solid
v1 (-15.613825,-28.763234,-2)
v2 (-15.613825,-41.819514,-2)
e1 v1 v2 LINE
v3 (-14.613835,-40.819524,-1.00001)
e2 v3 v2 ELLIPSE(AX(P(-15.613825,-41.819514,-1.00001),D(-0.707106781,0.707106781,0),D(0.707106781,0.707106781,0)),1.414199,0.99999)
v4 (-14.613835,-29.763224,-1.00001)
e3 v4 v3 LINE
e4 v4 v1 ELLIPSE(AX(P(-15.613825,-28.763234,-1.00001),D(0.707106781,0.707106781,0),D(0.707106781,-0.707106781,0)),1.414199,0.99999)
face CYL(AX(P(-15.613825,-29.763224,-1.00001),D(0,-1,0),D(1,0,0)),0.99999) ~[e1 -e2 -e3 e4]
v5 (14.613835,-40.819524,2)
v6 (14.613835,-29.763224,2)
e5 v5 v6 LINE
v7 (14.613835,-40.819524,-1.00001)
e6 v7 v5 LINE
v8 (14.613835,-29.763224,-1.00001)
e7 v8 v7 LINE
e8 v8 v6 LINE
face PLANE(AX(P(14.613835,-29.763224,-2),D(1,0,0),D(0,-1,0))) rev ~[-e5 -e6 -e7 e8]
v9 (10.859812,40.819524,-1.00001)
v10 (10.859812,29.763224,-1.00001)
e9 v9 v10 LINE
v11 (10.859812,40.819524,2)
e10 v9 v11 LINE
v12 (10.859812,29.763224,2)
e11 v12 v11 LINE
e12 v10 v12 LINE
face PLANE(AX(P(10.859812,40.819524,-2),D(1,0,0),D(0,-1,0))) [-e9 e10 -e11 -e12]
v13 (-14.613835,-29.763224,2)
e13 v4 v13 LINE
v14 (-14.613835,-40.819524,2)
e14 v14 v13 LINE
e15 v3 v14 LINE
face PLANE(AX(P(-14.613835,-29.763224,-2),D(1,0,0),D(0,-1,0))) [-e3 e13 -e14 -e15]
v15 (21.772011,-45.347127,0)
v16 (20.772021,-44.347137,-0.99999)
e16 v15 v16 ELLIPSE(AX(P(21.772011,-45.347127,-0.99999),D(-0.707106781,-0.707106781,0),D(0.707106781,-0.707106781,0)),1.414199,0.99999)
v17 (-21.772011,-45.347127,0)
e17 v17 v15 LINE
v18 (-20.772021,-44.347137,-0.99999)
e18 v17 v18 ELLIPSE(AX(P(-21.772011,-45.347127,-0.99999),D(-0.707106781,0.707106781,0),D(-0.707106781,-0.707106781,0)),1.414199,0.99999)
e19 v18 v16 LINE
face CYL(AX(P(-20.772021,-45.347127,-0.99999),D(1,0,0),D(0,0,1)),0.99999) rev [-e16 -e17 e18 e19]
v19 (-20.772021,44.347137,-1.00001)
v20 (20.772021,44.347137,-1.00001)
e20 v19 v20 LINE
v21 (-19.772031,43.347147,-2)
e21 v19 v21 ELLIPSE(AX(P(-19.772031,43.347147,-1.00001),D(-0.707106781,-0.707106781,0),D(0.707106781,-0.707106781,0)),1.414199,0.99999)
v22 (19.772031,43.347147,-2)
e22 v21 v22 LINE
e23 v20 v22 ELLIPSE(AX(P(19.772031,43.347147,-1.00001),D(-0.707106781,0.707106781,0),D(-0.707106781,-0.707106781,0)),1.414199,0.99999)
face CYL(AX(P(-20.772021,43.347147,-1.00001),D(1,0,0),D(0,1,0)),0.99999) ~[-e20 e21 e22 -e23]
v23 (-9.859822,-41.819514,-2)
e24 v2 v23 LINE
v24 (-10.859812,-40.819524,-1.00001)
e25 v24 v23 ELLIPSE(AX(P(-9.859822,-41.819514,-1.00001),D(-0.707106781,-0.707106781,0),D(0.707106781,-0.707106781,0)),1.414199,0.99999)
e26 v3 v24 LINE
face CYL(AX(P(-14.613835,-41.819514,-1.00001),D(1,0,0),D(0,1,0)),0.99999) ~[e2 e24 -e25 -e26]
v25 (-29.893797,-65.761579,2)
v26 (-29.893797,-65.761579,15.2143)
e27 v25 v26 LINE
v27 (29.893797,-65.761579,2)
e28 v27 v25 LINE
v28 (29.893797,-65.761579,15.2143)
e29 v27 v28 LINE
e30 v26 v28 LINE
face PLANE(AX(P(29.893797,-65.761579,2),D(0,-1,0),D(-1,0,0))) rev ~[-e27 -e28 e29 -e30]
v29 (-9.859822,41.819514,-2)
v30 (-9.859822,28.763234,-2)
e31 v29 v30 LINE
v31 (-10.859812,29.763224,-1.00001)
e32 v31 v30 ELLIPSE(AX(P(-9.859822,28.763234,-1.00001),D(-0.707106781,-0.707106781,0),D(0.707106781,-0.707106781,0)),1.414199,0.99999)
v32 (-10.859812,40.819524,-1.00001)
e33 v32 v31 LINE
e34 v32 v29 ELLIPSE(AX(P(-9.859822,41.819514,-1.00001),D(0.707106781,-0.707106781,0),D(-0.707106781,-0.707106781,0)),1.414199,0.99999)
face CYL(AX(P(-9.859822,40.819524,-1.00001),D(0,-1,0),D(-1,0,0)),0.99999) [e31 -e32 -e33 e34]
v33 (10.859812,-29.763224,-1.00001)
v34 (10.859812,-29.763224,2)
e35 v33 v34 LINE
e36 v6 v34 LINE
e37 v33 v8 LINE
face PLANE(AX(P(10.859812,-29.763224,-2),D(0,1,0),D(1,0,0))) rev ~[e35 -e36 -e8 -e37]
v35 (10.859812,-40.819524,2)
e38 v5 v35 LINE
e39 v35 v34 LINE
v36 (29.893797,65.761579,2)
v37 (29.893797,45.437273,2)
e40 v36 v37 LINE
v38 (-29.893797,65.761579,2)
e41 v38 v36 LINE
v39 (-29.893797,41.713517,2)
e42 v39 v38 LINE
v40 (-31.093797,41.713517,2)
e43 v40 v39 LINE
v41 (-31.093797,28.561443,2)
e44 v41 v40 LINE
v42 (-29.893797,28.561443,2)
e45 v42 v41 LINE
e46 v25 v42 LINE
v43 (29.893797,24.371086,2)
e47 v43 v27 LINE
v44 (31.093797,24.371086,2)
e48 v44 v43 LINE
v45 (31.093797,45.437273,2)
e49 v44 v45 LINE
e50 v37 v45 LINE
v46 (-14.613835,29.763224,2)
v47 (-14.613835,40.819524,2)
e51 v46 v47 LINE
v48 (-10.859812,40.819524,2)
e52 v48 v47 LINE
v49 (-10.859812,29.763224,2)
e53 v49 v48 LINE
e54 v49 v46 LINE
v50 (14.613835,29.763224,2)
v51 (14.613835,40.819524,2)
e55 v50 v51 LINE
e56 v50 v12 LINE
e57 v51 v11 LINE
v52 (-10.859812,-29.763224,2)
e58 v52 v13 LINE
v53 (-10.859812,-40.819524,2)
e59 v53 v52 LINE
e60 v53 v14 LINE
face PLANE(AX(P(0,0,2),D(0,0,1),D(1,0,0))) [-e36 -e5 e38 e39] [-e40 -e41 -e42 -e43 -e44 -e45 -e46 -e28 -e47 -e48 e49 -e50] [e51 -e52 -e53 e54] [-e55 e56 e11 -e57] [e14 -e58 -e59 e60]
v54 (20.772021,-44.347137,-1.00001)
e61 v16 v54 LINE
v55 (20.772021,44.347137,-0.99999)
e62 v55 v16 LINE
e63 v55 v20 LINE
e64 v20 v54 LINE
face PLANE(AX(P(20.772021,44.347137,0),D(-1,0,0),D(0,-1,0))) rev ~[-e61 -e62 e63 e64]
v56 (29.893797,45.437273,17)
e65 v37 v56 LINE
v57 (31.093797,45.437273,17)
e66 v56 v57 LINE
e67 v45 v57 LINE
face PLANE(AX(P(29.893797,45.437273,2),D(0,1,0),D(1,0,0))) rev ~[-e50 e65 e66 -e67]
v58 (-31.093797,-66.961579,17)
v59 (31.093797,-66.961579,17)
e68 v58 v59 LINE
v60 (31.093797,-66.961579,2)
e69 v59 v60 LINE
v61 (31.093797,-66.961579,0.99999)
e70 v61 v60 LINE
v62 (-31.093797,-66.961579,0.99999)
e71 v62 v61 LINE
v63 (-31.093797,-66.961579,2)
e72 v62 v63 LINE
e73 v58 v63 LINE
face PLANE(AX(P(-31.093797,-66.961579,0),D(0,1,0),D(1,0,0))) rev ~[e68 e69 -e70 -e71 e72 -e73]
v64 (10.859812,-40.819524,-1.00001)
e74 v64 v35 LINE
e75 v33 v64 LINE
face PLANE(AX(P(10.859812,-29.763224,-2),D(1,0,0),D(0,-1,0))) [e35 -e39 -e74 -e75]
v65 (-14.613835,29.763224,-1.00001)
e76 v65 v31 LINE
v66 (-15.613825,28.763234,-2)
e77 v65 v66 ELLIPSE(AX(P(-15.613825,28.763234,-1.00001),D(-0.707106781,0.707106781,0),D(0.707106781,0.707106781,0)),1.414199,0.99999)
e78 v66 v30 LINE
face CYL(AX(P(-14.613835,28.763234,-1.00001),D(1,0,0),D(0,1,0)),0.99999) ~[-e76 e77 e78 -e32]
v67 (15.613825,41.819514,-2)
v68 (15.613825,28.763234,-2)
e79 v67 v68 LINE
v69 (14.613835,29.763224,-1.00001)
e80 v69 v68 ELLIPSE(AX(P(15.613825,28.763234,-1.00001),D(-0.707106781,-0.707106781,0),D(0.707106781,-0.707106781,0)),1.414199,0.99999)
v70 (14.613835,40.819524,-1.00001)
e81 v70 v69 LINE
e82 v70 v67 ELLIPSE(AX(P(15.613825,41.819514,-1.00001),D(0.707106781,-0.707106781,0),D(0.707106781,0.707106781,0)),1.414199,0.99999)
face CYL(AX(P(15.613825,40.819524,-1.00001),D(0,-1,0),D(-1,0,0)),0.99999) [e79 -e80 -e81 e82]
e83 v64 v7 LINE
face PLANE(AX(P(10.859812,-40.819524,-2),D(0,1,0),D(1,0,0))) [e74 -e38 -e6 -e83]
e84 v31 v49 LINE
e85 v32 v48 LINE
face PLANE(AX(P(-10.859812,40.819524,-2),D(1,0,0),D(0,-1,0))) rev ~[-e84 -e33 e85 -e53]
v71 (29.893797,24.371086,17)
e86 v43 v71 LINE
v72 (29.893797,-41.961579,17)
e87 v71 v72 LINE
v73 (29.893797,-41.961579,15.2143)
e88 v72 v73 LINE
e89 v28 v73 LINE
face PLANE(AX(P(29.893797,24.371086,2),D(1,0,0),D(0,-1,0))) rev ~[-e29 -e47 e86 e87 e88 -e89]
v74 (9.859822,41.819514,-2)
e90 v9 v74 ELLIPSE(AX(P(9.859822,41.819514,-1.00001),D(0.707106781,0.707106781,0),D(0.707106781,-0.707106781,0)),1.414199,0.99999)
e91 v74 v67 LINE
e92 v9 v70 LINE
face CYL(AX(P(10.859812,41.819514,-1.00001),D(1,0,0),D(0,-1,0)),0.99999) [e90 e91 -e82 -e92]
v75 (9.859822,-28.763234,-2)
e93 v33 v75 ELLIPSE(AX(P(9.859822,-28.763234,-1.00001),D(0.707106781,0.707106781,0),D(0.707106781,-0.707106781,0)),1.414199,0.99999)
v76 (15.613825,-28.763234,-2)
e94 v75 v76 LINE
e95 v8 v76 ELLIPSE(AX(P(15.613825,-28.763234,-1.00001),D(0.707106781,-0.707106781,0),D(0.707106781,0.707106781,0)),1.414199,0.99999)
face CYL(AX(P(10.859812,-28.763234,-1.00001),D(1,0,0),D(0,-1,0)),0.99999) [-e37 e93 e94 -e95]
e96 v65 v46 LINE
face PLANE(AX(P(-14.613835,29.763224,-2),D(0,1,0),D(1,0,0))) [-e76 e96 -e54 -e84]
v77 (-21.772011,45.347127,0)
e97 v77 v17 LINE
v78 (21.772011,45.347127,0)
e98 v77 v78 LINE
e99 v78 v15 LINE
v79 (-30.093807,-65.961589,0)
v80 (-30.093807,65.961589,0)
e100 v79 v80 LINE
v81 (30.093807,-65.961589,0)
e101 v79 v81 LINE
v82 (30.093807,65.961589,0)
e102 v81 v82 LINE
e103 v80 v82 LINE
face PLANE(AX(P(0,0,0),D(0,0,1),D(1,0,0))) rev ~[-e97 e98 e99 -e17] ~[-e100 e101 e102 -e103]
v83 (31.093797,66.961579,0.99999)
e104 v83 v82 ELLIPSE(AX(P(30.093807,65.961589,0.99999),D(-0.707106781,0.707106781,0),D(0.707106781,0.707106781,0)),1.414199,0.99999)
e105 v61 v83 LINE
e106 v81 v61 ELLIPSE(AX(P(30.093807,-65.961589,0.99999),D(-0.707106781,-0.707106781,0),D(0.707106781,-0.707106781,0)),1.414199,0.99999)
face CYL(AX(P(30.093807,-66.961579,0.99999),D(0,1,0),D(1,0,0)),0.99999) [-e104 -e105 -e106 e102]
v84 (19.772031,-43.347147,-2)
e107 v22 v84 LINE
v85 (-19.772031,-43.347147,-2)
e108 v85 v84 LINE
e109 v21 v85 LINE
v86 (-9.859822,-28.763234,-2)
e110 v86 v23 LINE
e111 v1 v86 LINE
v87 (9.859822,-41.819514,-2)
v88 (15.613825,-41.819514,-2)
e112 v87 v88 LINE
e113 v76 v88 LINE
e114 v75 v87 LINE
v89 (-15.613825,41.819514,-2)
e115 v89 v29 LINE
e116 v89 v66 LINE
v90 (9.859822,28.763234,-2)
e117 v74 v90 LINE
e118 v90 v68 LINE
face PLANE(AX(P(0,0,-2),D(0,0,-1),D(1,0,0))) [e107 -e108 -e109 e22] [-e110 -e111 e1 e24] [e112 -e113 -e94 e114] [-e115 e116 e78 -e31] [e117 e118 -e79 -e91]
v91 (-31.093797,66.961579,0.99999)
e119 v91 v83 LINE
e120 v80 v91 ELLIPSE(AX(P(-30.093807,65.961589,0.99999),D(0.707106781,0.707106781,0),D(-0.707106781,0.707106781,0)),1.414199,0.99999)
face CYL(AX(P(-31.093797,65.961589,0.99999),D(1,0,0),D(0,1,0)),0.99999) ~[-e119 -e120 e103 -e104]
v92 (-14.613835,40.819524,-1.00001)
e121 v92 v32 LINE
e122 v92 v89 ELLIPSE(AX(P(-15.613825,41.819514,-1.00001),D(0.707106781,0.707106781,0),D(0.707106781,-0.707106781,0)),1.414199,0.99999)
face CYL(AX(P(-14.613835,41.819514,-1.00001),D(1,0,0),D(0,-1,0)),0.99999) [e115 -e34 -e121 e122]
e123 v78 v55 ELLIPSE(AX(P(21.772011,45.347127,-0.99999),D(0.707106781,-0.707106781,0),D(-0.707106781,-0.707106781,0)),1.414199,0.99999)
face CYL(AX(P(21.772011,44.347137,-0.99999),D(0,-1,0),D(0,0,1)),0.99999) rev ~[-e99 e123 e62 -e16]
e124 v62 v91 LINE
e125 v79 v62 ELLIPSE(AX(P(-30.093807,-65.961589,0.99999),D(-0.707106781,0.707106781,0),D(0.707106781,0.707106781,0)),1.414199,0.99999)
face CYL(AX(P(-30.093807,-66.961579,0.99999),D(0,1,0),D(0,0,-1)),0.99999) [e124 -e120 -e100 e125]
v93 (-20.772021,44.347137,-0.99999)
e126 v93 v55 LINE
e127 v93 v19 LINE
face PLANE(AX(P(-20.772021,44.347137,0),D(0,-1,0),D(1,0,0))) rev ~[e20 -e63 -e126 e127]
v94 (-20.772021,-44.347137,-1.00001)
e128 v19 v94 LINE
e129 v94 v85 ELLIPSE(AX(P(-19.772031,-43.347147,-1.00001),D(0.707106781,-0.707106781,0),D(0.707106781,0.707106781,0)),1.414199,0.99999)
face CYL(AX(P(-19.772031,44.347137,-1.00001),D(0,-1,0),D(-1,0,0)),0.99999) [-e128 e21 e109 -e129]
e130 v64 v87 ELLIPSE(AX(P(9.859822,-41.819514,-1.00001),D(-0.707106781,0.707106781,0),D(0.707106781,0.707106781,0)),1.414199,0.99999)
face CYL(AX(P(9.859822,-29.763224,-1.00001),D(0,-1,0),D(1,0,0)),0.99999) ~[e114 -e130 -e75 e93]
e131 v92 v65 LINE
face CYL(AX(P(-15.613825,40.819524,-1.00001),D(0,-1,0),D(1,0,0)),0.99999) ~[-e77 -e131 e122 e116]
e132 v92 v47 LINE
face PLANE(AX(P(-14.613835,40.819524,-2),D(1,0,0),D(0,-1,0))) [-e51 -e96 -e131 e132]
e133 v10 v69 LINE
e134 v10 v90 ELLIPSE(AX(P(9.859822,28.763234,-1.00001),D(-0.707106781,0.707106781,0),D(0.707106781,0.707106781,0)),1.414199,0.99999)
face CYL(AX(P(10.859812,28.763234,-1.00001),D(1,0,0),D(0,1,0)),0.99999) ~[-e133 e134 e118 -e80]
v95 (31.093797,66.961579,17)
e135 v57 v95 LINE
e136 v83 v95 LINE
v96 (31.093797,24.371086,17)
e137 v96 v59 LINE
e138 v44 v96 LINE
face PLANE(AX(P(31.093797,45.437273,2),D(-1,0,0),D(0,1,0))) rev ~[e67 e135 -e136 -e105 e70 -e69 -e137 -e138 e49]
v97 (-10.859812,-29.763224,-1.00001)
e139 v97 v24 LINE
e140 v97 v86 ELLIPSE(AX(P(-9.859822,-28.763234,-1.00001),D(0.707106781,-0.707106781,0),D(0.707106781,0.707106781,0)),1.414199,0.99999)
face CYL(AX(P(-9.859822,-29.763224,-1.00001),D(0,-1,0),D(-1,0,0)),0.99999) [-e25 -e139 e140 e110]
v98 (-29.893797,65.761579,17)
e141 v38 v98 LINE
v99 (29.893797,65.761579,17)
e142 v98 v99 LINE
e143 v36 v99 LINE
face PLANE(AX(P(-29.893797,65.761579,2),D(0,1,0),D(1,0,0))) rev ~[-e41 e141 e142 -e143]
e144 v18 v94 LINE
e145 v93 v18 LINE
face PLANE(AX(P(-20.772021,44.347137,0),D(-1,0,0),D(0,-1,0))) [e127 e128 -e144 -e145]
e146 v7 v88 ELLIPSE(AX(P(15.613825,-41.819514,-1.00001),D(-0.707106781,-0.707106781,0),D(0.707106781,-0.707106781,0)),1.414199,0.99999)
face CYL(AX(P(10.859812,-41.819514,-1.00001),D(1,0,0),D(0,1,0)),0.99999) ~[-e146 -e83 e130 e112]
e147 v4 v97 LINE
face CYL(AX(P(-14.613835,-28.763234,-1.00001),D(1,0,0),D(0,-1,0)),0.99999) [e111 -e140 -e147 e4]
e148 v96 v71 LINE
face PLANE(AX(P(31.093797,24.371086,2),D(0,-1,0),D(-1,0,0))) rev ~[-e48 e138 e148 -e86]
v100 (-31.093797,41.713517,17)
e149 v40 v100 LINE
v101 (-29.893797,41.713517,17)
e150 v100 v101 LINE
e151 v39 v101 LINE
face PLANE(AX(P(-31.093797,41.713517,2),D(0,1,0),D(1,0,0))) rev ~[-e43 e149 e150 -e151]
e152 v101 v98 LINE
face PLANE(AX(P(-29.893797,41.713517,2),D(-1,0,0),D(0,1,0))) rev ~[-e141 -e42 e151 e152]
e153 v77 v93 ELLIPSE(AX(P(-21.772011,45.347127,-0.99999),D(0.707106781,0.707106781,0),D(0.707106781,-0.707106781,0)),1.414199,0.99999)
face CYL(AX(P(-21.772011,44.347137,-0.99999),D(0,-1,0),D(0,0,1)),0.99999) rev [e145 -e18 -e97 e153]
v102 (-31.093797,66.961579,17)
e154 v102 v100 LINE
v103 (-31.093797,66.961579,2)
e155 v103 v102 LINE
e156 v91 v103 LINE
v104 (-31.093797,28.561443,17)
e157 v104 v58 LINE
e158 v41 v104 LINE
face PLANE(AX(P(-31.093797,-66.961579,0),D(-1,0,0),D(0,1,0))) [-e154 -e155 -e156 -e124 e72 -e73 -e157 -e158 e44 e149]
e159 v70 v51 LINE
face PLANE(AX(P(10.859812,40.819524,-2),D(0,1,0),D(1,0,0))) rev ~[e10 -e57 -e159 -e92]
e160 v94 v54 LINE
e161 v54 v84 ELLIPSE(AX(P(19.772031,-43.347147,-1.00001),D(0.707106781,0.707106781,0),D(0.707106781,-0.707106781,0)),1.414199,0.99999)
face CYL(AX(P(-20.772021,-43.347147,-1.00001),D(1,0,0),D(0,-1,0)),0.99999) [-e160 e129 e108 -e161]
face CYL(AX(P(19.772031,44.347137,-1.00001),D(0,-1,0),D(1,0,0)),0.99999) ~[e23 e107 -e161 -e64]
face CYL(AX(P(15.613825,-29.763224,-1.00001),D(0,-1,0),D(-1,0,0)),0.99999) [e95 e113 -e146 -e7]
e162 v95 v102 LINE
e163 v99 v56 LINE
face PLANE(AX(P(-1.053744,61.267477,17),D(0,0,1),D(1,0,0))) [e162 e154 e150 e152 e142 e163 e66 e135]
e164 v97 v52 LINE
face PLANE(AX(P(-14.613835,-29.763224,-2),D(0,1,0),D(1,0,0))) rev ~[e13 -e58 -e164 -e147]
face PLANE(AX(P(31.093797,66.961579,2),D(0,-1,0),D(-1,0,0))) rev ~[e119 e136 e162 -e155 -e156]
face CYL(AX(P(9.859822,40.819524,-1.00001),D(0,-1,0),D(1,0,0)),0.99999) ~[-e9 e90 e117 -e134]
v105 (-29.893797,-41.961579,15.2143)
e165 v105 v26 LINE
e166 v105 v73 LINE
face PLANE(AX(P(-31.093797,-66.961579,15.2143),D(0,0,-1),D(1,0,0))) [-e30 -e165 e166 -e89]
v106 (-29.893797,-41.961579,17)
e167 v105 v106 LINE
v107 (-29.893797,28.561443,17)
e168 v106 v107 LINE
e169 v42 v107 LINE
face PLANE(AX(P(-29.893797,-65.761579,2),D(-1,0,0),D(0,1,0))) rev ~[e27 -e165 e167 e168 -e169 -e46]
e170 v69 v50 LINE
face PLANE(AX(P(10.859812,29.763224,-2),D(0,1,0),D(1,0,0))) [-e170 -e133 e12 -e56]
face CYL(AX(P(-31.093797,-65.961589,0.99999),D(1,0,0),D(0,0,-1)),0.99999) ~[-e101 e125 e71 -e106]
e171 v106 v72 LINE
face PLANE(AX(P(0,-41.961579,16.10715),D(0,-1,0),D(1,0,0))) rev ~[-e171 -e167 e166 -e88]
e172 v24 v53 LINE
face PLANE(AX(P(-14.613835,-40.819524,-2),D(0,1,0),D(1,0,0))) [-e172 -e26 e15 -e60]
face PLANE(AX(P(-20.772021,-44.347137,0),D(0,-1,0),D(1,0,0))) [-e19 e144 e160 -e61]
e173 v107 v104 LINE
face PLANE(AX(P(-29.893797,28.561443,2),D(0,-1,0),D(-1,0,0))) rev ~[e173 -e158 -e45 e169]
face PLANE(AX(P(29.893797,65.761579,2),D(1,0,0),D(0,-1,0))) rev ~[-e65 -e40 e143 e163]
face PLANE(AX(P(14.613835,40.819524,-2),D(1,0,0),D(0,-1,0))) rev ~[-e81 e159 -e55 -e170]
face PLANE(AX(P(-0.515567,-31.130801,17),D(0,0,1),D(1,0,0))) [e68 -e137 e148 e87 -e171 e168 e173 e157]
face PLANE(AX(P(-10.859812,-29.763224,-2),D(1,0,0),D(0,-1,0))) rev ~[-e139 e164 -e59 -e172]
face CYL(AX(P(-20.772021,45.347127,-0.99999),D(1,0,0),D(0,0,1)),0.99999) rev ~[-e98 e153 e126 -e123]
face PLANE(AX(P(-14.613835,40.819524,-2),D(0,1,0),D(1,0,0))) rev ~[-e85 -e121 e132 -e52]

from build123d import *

# Parameters (mm, degrees)
F0_W     = 62.1875934303
F0_H     = 133.9231580496
F1_DEPTH = 2
F3_DEPTH = 15
F4_W     = 62.1875934303
F4_H     = 1.7857002169
F5_DEPTH = 25
F6_W     = 41.5440425277
F6_H     = 88.6942744255
F7_DEPTH = 2
F8_W     = 3.7540234625
F8_H     = 11.0563002527
F9_DEPTH = 8
F10_R    = 0.99999


# Not quite as in the source:
# - a fillet or chamfer is up to 0.001 mm smaller than in the source, because OpenCascade refuses the exact size


with BuildPart() as f1:
    # F0 (on Top) → F1 (new body)
    with BuildSketch(Plane.XY):
        Rectangle(F0_W, F0_H)
    extrude(amount=F1_DEPTH)

    # F2 (on face) → F3 (join)
    with BuildSketch(Plane.XY.offset(2)):
        Polygon((29.8937967151, 45.4372726381), (31.0937967151, 45.4372726381), (31.0937967151, 66.9615790248), (-31.0937967151, 66.9615790248), (-31.0937967151, 41.7135171592), (-29.8937967151, 41.7135171592), (-29.8937967151, 65.7615790248), (29.8937967151, 65.7615790248), align=None)
        Polygon((-31.0937967151, -66.9615790248), (31.0937967151, -66.9615790248), (31.0937967151, 24.3710856885), (29.8937967151, 24.3710856885), (29.8937967151, -65.7615790248), (-29.8937967151, -65.7615790248), (-29.8937967151, 28.5614430904), (-31.0937967151, 28.5614430904), align=None)
    extrude(amount=F3_DEPTH)

    # F4 (on face) → F5 (join)
    with BuildSketch(Plane.XZ.offset(66.9615790248)):
        with Locations((0, 16.1071498916)):
            Rectangle(F4_W, F4_H)
    extrude(amount=-F5_DEPTH)

    # F6 (on face) → F7 (join)
    with BuildSketch(Plane(origin=(0, 0, 0), x_dir=(1, 0, 0), z_dir=(0, 0, -1))):
        Rectangle(F6_W, F6_H)
    extrude(amount=F7_DEPTH)

    # F8 (on face) → F9 (cut)
    with BuildSketch(Plane(origin=(0, 0, -2), x_dir=(1, 0, 0), z_dir=(0, 0, -1))):
        with Locations((12.7368234098, -35.2913737297)):
            Rectangle(F8_W, F8_H)
        with Locations((-12.7368234098, -35.2913737297)):
            Rectangle(F8_W, F8_H)
        with Locations((-12.7368234098, 35.2913737297)):
            Rectangle(F8_W, F8_H)
        with Locations((12.7368234098, 35.2913737297)):
            Rectangle(F8_W, F8_H)
    extrude(amount=-F9_DEPTH, mode=Mode.SUBTRACT)

    # F10 (radius 1 in the source; OpenCascade refuses exactly that, so slightly less here)
    f10_edges = [f1.edges().sort_by_distance(p)[0] for p in [
        (0, -44.347137, -2),
        (20.772021, 0, -2),
        (-20.772021, 0, -2),
        (0, 44.347137, -2),
        (-10.859812, 35.291374, -2),
        (-12.736823, 29.763224, -2),
        (-14.613835, 35.291374, -2),
        (-12.736823, 40.819524, -2),
        (12.736823, 29.763224, -2),
        (10.859812, 35.291374, -2),
        (12.736823, 40.819524, -2),
        (14.613835, 35.291374, -2),
        (-12.736823, -29.763224, -2),
        (-10.859812, -35.291374, -2),
        (-12.736823, -40.819524, -2),
        (-14.613835, -35.291374, -2),
        (12.736823, -29.763224, -2),
        (14.613835, -35.291374, -2),
        (12.736823, -40.819524, -2),
        (10.859812, -35.291374, -2),
        (-31.093797, 0, 0),
        (0, 66.961579, 0),
        (0, -66.961579, 0),
        (31.093797, 0, 0),
        (20.772021, 0, 0),
        (0, 44.347137, 0),
        (-20.772021, 0, 0),
        (0, -44.347137, 0),
    ]]
    fillet(f10_edges, radius=F10_R)


solid = f1.part
